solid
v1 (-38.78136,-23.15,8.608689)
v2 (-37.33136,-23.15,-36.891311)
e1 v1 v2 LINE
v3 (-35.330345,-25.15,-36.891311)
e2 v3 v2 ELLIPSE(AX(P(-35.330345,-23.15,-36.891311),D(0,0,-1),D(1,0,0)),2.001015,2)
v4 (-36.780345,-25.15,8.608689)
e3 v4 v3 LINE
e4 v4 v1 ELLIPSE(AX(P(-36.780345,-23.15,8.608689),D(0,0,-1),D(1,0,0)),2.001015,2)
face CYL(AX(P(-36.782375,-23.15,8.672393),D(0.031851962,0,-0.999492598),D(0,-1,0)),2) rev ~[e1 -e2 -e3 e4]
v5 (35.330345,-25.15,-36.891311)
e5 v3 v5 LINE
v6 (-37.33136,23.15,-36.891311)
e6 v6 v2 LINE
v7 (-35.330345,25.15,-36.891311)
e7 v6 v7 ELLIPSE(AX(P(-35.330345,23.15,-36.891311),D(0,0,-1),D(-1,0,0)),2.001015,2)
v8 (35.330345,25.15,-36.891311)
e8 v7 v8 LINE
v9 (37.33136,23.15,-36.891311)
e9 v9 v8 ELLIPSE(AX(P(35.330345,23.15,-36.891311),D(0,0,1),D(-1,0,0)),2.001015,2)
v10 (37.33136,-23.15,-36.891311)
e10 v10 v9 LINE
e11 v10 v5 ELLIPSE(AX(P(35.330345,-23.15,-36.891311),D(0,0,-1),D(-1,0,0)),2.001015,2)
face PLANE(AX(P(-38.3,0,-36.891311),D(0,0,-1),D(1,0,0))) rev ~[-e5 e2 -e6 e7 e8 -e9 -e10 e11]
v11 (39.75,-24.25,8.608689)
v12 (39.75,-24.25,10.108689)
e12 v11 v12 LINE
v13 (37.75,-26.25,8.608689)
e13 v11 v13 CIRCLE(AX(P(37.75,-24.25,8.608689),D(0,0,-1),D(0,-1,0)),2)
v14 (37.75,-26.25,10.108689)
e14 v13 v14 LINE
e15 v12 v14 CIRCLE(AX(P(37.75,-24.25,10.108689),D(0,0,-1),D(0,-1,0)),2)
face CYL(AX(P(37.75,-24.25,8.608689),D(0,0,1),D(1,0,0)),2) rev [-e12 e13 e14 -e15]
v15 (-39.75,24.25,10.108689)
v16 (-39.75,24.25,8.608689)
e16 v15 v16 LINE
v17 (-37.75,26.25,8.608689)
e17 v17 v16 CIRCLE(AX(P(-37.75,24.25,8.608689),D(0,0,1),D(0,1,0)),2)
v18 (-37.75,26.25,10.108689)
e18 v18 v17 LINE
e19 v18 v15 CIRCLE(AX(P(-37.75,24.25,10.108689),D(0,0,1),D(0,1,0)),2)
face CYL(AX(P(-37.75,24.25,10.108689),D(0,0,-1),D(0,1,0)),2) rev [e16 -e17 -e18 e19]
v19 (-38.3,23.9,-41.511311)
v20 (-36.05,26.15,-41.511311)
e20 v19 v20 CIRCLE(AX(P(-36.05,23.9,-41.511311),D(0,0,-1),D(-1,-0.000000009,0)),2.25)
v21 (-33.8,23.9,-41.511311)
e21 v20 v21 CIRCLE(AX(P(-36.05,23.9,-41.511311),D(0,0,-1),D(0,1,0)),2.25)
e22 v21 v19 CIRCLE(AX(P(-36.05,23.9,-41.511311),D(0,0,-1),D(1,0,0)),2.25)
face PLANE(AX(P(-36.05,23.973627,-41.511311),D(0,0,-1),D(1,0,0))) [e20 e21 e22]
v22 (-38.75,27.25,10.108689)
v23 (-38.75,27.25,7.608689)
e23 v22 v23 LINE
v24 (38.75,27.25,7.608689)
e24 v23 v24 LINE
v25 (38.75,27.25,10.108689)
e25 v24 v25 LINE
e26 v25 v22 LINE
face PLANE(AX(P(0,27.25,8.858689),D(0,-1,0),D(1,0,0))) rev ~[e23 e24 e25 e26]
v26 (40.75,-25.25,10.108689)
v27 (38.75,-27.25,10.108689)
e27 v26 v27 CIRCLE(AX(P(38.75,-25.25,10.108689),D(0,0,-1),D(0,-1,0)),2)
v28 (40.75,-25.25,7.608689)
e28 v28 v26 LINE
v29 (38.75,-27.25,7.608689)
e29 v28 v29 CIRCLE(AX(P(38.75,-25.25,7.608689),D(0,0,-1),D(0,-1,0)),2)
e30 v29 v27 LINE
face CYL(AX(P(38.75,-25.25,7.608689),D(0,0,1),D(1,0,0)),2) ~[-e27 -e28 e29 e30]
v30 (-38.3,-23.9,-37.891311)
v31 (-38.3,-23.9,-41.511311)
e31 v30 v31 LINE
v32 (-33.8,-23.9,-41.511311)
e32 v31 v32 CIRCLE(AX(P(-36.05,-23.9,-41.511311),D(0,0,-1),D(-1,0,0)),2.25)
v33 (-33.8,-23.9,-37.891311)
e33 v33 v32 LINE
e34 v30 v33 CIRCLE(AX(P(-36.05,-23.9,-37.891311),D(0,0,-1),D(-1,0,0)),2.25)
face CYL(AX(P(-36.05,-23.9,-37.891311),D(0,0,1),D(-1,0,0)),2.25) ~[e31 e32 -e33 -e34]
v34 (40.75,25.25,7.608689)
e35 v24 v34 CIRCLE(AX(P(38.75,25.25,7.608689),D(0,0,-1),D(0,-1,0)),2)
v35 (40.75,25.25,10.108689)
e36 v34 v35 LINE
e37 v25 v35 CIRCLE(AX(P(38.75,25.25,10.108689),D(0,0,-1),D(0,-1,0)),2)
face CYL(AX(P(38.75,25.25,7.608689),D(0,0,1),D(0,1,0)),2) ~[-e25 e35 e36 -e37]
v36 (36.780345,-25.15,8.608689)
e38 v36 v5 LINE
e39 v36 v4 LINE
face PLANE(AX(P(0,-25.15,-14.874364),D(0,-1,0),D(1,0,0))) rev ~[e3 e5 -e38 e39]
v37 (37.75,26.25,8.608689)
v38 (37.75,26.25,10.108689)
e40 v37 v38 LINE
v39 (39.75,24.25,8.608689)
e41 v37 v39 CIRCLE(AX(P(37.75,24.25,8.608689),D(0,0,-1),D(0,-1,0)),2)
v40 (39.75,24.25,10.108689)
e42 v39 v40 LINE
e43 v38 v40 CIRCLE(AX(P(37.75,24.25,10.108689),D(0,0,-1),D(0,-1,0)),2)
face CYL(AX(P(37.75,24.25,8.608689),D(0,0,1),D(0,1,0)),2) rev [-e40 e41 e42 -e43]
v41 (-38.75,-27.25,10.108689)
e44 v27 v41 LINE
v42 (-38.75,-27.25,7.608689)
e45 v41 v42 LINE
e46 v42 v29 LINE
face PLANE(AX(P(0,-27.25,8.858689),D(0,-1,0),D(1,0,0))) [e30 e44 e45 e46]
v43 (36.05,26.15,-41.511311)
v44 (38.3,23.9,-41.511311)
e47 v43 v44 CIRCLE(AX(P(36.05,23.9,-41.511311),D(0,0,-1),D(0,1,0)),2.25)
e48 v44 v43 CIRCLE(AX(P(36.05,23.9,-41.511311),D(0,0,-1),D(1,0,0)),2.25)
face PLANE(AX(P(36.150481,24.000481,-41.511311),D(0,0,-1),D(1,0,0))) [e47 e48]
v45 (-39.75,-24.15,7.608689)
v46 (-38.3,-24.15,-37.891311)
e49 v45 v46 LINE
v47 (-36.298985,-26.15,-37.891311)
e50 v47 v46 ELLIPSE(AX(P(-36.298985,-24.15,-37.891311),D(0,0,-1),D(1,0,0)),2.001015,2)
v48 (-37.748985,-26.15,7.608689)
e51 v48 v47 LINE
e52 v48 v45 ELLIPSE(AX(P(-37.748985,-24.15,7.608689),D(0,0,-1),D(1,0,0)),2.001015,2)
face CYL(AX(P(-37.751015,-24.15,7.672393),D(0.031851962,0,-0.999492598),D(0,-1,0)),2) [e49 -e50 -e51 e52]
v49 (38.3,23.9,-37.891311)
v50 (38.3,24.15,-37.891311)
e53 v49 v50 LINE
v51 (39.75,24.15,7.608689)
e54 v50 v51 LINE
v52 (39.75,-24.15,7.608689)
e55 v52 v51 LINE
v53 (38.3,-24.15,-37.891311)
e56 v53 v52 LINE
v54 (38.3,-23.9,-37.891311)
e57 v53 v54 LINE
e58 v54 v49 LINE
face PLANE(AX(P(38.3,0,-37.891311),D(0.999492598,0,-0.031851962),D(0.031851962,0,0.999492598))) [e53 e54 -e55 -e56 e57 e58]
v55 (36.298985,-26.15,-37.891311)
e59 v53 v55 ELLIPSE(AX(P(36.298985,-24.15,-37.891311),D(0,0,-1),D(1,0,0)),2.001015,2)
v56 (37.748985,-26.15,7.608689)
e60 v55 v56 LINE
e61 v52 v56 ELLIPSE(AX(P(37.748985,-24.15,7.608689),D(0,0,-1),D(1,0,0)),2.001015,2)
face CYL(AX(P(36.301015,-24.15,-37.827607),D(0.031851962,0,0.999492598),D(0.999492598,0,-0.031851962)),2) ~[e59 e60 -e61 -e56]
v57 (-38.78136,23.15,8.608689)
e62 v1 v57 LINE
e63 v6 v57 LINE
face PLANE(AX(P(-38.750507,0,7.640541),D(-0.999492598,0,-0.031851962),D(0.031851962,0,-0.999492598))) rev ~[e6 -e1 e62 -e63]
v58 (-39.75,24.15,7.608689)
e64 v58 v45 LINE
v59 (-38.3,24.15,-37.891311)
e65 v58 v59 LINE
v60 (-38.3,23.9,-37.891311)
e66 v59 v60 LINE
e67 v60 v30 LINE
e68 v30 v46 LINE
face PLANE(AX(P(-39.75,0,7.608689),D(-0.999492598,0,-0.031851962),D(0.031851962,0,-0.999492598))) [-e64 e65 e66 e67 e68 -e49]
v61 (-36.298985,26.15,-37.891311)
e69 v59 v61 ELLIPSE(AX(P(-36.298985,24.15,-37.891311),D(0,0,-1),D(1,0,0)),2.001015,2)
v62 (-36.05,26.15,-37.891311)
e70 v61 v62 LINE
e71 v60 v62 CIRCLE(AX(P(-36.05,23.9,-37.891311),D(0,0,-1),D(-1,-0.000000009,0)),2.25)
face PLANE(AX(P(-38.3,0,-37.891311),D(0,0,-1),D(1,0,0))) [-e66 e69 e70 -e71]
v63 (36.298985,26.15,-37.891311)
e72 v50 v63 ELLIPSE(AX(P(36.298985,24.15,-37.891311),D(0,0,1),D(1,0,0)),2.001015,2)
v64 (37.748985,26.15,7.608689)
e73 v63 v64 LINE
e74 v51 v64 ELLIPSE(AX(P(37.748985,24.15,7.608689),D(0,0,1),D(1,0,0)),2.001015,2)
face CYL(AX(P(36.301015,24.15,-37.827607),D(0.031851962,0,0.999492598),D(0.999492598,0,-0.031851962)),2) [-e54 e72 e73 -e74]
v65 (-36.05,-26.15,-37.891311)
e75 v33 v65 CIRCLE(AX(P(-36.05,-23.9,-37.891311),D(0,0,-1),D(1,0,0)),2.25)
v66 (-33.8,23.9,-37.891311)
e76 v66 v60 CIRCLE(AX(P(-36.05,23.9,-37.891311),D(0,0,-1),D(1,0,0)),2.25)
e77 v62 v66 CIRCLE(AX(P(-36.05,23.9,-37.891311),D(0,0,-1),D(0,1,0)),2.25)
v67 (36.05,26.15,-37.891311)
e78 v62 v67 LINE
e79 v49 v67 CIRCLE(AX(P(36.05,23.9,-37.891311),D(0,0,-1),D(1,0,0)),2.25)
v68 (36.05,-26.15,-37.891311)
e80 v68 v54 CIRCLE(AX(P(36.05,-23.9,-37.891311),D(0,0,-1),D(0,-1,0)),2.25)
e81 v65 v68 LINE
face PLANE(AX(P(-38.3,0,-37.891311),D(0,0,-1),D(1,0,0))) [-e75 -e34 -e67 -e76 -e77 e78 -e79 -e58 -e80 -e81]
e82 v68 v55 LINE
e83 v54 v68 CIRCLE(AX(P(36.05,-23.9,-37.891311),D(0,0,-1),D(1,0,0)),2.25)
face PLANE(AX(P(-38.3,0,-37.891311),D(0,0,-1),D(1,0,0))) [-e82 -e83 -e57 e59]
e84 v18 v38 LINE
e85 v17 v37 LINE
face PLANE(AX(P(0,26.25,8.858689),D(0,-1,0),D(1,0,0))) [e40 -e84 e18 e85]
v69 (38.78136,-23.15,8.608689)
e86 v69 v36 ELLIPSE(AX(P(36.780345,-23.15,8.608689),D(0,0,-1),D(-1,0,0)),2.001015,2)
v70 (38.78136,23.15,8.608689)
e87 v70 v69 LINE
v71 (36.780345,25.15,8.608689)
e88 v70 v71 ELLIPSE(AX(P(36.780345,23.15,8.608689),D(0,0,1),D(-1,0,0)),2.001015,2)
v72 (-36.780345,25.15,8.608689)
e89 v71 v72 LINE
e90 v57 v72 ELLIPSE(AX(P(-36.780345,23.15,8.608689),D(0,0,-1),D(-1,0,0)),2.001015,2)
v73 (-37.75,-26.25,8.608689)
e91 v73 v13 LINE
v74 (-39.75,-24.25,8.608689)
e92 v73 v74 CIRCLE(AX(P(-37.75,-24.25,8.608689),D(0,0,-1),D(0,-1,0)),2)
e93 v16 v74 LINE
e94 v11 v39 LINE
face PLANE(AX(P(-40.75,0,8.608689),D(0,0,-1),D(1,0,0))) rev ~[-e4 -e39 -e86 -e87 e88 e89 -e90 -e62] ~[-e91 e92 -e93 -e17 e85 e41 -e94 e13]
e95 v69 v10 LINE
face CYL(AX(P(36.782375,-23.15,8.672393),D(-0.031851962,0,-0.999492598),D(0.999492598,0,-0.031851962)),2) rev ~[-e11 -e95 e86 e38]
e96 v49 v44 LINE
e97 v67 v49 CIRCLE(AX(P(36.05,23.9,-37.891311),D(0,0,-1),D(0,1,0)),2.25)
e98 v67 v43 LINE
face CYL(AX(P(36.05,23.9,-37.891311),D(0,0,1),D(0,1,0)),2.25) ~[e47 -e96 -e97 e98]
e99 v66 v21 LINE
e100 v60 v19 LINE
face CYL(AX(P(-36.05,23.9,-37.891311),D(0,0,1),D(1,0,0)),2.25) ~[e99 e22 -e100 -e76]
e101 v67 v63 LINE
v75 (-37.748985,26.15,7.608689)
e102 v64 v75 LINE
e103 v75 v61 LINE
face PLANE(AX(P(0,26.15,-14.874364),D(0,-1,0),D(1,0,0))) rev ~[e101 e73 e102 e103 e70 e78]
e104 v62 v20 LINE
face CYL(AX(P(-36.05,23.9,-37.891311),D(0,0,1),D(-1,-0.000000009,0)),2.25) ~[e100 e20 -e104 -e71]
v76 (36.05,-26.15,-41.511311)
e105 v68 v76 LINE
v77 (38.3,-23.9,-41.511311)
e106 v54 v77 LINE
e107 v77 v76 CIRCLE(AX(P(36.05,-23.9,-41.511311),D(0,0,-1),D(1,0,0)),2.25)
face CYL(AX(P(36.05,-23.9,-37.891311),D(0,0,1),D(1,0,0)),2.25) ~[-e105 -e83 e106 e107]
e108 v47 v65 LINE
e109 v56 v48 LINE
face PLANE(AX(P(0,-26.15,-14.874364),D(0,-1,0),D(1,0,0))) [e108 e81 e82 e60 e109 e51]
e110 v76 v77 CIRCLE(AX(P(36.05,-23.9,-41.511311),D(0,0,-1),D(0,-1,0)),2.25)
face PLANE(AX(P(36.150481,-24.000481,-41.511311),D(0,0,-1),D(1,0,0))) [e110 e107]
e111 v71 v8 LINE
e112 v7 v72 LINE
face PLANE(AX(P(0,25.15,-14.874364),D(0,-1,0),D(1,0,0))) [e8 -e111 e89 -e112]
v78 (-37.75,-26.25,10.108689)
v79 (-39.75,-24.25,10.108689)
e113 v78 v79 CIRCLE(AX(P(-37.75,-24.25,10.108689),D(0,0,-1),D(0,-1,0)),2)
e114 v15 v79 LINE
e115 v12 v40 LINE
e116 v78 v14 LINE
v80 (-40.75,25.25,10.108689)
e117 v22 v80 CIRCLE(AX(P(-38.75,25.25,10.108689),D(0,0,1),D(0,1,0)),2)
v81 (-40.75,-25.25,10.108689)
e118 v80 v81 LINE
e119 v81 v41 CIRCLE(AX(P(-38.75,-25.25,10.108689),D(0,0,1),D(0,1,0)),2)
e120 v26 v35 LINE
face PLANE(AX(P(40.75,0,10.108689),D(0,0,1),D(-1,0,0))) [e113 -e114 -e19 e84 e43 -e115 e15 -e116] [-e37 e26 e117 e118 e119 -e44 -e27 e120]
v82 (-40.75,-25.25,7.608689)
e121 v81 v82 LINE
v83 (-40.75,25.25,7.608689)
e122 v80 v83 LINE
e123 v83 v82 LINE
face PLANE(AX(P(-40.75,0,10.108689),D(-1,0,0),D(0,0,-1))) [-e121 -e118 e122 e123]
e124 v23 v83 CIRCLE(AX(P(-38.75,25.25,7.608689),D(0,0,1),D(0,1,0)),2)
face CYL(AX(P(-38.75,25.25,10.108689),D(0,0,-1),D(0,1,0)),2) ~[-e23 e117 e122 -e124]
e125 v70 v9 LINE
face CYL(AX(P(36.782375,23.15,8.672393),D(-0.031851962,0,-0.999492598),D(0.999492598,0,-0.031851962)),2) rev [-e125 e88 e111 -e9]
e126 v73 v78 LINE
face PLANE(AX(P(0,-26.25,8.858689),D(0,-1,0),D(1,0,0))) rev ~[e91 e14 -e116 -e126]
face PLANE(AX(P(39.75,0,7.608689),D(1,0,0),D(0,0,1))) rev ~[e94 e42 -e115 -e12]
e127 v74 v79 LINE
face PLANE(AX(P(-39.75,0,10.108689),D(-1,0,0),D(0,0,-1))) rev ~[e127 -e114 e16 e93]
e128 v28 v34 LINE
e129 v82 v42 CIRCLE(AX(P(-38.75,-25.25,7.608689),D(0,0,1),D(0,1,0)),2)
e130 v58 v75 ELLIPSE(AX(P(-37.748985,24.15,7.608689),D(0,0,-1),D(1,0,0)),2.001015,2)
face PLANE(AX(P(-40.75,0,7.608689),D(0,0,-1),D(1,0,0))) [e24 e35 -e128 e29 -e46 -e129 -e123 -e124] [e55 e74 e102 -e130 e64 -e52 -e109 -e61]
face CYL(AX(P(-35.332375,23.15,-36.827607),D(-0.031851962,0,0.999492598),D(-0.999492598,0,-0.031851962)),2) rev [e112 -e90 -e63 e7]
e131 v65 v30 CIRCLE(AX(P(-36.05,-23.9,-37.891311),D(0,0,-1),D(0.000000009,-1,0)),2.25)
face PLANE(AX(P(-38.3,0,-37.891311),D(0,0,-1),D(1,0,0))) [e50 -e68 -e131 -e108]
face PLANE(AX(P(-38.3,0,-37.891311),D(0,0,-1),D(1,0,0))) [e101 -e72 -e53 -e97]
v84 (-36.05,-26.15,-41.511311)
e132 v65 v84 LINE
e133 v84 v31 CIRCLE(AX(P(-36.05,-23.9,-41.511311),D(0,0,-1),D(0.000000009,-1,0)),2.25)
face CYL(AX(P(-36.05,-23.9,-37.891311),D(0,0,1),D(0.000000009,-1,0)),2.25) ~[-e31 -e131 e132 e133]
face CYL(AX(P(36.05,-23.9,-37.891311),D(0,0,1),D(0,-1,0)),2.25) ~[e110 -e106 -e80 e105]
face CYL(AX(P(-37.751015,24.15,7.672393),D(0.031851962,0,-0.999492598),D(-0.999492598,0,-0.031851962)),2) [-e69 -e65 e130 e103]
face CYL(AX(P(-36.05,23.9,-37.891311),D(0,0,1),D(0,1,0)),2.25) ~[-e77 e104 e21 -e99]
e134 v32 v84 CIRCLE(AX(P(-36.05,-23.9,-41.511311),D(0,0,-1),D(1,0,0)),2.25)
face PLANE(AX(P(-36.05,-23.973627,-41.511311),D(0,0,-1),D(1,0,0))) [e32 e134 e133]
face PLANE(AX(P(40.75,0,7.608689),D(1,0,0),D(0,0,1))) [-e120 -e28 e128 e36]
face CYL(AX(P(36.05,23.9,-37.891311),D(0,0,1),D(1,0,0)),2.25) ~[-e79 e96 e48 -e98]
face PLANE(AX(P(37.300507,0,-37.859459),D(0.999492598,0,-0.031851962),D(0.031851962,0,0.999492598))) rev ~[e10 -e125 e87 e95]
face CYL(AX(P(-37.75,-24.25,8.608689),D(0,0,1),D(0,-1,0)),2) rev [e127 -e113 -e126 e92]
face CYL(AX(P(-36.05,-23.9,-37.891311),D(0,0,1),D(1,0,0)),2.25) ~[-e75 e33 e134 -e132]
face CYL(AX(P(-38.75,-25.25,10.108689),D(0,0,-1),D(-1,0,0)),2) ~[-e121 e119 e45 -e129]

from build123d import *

# Parameters (mm, degrees)
F1_DEPTH = 27.25
F2_DEPTH = 26.15
F4_T     = -1
F5_DEPTH = 3.62
F6_R     = 2


with BuildPart() as f1:
    # F0 (on Front) → F1 (new body, symmetric)
    with BuildSketch(Plane.XZ):
        Polygon((40.75, 10.1086891984), (0, 10.1086891984), (-40.75, 10.1086891984), (-40.75, 7.6086891984), (-39.75, 7.6086891984), (39.75, 7.6086891984), (40.75, 7.6086891984), align=None)
    extrude(amount=F1_DEPTH, both=True)

    # F0 (on Front) → F2 (join, symmetric)
    with BuildSketch(Plane.XZ):
        Polygon((39.75, 7.6086891984), (-39.75, 7.6086891984), (-38.3, -37.8913108016), (0, -37.8913108016), (38.3, -37.8913108016), align=None)
    extrude(amount=F2_DEPTH, both=True)

    # F4
    f4_openings = [f1.faces().sort_by_distance(p)[0] for p in [
        (0, 0, 10.108689),
    ]]
    offset(amount=F4_T, openings=f4_openings, kind=Kind.INTERSECTION)

    # F3 (on face) → F5 (join)
    with BuildSketch(Plane(origin=(0, 0, -37.8913108016), x_dir=(1, 0, 0), z_dir=(0, 0, -1))):
        with BuildLine():
            ThreePointArc((-38.3, 23.9), (-36.05, 21.65), (-33.8, 23.9))
            ThreePointArc((-33.8, 23.9), (-34.4590097351, 25.4909902504), (-36.0499999795, 26.15))
            ThreePointArc((-36.0499999795, 26.15), (-37.6409902504, 25.4909902649), (-38.3, 23.9))
        make_face()
        with BuildLine():
            ThreePointArc((-33.8, -23.9), (-36.0499999898, -21.65), (-38.3, -23.8999999795))
            ThreePointArc((-38.3, -23.8999999795), (-37.6409902649, -25.4909902504), (-36.05, -26.15))
            ThreePointArc((-36.05, -26.15), (-34.4590097423, -25.4909902577), (-33.8, -23.9))
        make_face()
        with BuildLine():
            ThreePointArc((36.05, -26.15), (37.6409902577, -25.4909902577), (38.3, -23.9))
            ThreePointArc((38.3, -23.9), (34.4590097423, -22.3090097423), (36.05, -26.15))
        make_face()
        with BuildLine():
            ThreePointArc((38.3, 23.9), (37.6409902577, 25.4909902577), (36.05, 26.15))
            ThreePointArc((36.05, 26.15), (34.4590097423, 22.3090097423), (38.3, 23.9))
        make_face()
    extrude(amount=F5_DEPTH)

    # F6
    f6_edges = [f1.edges().sort_by_distance(p)[0] for p in [
        (-39.025, -26.15, -15.141311),
        (39.025, -26.15, -15.141311),
        (39.025, 26.15, -15.141311),
        (-39.025, 26.15, -15.141311),
        (-40.75, 27.25, 8.858689),
        (-40.75, -27.25, 8.858689),
        (40.75, -27.25, 8.858689),
        (40.75, 27.25, 8.858689),
        (38.05636, -25.15, -14.141311),
        (-38.05636, -25.15, -14.141311),
        (-38.05636, 25.15, -14.141311),
        (38.05636, 25.15, -14.141311),
        (39.75, 26.25, 9.358689),
        (-39.75, 26.25, 9.358689),
        (39.75, -26.25, 9.358689),
        (-39.75, -26.25, 9.358689),
    ]]
    fillet(f6_edges, radius=F6_R)


solid = f1.part
